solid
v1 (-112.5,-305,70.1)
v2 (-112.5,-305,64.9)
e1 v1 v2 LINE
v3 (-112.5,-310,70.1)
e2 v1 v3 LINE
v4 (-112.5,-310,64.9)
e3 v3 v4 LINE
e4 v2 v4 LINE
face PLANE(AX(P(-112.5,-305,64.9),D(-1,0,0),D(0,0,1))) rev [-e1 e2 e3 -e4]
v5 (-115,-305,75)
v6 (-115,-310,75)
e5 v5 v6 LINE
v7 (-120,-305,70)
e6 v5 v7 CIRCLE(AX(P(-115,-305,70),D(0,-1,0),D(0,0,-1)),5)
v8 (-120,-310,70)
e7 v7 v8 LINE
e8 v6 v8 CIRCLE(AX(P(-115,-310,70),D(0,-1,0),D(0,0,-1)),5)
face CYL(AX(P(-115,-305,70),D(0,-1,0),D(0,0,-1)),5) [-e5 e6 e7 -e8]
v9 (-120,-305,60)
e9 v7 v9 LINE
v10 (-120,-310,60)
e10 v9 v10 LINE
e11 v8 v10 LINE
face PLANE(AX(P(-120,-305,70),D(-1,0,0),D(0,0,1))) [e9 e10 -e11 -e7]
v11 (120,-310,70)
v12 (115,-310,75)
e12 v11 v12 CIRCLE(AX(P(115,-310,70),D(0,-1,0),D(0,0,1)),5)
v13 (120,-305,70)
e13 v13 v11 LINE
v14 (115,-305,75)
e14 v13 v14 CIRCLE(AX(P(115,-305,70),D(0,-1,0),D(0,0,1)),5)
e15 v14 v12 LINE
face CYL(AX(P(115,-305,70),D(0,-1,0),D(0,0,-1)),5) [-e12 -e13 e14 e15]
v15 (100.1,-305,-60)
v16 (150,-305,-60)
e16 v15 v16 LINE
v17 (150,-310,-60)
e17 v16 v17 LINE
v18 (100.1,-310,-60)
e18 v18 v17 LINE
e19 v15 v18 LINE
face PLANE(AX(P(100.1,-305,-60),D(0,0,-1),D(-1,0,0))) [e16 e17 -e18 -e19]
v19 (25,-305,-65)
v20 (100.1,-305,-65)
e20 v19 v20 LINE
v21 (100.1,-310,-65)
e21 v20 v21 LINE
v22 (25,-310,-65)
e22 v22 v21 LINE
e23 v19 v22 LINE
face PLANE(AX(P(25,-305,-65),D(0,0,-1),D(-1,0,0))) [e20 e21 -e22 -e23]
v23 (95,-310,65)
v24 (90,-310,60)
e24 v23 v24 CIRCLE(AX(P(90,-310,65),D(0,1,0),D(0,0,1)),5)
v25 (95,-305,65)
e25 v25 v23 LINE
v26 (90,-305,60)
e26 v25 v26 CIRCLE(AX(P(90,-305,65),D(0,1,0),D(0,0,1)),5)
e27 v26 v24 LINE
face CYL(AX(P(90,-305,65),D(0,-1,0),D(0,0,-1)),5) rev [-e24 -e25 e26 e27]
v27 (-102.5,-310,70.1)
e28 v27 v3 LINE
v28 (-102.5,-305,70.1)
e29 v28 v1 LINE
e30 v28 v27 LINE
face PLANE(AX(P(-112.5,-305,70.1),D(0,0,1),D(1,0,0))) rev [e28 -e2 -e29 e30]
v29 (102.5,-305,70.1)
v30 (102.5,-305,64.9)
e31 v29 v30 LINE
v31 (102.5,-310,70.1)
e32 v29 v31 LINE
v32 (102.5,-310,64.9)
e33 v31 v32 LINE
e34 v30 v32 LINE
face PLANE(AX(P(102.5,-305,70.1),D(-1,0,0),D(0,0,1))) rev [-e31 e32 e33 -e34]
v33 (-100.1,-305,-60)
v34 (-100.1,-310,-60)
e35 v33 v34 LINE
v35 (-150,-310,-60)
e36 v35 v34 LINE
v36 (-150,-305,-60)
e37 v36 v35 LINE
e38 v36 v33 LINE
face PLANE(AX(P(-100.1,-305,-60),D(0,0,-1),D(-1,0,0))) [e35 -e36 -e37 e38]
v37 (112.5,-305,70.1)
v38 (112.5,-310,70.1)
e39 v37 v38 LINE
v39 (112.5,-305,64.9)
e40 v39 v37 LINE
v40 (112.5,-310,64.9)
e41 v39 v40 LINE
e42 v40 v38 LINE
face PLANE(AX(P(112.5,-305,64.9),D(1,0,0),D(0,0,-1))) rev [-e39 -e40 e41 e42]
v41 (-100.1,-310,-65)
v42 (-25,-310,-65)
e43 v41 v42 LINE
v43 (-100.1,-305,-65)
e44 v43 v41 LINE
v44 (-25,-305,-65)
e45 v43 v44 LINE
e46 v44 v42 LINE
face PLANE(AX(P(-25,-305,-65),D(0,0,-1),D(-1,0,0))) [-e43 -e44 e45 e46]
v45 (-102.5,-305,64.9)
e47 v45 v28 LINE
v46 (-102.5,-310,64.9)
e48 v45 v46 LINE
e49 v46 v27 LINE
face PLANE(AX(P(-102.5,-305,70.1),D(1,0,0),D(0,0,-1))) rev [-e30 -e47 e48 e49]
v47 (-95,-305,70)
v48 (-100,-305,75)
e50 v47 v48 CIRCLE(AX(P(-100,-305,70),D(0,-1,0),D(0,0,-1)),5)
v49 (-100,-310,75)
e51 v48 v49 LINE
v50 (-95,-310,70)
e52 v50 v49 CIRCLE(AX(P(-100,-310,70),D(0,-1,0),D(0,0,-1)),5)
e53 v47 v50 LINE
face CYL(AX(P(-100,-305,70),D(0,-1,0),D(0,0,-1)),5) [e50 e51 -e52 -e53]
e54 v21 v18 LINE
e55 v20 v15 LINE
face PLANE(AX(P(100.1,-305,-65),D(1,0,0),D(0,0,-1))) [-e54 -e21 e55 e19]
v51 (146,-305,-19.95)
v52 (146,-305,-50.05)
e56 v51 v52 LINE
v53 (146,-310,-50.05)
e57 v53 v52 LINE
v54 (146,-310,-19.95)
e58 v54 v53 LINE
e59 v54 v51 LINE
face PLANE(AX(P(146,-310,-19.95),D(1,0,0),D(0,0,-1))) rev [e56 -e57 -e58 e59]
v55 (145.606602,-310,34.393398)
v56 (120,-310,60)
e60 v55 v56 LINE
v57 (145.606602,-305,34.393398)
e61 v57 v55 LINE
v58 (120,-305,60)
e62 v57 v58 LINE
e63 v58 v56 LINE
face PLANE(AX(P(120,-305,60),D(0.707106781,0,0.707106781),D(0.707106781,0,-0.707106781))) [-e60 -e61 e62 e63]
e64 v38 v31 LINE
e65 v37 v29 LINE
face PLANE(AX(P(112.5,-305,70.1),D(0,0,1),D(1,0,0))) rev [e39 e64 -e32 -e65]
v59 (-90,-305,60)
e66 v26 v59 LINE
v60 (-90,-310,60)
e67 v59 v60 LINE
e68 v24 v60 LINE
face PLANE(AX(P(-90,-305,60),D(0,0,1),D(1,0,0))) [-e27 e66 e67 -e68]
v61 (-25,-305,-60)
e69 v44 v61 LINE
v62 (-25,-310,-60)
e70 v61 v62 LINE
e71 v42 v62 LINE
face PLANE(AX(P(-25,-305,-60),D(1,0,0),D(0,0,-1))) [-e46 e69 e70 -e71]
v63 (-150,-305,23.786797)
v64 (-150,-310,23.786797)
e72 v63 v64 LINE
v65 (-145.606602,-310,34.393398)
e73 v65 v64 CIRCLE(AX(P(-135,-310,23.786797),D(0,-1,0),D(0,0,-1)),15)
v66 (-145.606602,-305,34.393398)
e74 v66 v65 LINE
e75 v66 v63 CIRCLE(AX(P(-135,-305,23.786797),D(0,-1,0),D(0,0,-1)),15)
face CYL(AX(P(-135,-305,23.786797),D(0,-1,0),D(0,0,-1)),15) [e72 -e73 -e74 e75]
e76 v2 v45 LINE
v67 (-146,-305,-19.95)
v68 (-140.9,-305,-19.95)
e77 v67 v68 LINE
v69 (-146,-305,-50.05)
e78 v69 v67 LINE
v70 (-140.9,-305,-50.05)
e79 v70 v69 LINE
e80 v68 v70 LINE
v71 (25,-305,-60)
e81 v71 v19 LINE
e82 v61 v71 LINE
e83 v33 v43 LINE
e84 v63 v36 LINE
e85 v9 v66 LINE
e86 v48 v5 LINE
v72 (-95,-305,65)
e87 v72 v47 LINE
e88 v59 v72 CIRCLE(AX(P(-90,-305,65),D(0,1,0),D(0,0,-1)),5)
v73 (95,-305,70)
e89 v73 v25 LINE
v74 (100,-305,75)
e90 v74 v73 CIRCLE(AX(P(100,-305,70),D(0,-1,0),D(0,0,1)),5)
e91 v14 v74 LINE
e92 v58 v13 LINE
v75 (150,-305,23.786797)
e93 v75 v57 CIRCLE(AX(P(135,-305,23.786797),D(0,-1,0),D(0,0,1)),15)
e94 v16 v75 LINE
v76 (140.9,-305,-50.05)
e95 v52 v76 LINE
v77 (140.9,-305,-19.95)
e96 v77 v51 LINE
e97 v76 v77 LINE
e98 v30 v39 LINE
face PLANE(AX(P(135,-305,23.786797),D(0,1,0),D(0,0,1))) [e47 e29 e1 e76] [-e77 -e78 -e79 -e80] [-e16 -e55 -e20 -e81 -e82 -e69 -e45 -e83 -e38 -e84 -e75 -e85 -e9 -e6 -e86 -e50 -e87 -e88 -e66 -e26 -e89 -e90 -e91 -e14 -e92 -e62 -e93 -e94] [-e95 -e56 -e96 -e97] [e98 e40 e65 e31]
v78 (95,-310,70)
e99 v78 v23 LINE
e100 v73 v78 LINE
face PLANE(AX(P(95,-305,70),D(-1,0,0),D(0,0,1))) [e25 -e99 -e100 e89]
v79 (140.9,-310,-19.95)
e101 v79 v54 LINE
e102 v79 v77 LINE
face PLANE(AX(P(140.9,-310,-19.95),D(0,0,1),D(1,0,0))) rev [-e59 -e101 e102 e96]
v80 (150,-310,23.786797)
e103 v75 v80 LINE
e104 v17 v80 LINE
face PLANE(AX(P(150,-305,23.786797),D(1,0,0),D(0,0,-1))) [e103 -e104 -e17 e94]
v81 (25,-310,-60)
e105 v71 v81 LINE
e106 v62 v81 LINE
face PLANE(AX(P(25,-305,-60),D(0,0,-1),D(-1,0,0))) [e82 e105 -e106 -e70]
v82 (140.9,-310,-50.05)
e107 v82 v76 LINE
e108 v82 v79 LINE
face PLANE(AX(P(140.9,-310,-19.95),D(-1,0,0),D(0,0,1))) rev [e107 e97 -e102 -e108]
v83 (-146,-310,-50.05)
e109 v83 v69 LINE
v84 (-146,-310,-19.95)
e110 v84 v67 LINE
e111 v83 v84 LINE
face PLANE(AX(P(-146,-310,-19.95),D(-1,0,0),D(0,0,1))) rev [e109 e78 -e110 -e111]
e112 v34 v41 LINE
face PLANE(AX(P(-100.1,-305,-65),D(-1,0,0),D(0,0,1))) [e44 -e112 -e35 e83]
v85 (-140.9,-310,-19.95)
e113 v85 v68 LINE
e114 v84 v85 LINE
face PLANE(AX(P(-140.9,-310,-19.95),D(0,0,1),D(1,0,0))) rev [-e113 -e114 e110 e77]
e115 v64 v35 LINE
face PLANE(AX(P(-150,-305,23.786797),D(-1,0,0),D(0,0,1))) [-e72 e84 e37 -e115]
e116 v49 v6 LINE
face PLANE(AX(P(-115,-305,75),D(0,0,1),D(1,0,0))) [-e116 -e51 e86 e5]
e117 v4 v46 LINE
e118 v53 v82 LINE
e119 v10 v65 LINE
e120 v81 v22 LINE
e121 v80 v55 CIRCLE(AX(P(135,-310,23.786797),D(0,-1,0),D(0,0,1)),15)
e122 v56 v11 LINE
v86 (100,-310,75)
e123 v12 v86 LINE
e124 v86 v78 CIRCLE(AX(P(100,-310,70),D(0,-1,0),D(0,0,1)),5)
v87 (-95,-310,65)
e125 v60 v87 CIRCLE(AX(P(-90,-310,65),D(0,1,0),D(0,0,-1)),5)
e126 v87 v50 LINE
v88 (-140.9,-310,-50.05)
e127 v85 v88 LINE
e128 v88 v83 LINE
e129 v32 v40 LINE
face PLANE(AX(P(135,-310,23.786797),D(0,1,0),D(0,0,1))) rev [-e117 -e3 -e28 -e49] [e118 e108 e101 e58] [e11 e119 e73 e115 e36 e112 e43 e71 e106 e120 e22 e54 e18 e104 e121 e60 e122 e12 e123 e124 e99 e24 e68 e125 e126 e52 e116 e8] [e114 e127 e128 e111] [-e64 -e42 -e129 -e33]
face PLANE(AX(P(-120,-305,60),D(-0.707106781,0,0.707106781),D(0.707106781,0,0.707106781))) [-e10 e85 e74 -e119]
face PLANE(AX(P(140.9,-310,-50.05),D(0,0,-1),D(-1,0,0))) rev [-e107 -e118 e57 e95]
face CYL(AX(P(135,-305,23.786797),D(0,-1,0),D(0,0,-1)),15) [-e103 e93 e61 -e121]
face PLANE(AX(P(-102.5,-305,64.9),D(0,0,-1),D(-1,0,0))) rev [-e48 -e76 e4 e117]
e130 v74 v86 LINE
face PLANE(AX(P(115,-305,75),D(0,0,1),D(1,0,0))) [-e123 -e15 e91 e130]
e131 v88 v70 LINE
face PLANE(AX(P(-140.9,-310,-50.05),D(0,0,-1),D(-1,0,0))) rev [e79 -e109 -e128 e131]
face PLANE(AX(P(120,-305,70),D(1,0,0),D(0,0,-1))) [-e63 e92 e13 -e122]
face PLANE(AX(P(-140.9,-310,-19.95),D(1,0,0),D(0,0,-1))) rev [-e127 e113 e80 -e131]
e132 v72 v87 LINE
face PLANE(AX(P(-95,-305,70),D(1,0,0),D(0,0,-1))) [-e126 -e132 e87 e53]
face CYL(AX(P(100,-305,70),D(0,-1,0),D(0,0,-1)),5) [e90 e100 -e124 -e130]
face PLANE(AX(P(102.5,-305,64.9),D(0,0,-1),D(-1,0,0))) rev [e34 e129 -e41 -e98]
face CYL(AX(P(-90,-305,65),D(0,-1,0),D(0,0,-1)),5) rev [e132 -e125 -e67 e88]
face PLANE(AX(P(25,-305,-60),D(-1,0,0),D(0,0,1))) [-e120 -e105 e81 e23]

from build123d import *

# Parameters (mm, degrees)
BODY_MOVE_COPY1_START         = -65
BODY_MOVE_COPY1_OUTLINE_W     = 5.1
BODY_MOVE_COPY1_OUTLINE_H     = 30.1
BODY_MOVE_COPY1_OUTLINE_R     = 2.6
BODY_MOVE_COPY1_OUTLINE_R_2   = 3.1
BODY_MOVE_COPY1_OUTLINE_R_3   = 1.55
BODY_MOVE_COPY1_OUTLINE_W_2   = 30.5
BODY_MOVE_COPY1_OUTLINE_H_2   = 14.5
BODY_MOVE_COPY1_DEPTH         = 5
BODY_MOVE_COPY1_START_2       = -5
BODY_MOVE_COPY1_2_OUTLINE_W   = 10
BODY_MOVE_COPY1_2_OUTLINE_H   = 5.2
BODY_MOVE_COPY1_2_OUTLINE_R   = 1.6
BODY_MOVE_COPY1_2_OUTLINE_W_2 = 5.1
BODY_MOVE_COPY1_2_OUTLINE_H_2 = 30.1
BODY_MOVE_COPY1_2_DEPTH       = 5
SKETCH26_W                    = 10
SKETCH26_H                    = 5.2
BOSS_EXTRUDE2_DEPTH           = 5
SKETCH28_W                    = 5.1
SKETCH28_H                    = 30.1
CUT_EXTRUDE1_DEPTH            = 349.066085679


# Read off the part's stored shape, not the designer's step: Body-Move/Copy1
with BuildPart() as part:
    # Body-Move/Copy1 outline → Body-Move/Copy1 (new body)
    with BuildSketch(Plane.XY.offset(BODY_MOVE_COPY1_START)):
        Polygon((24.9, -310), (24.9, -305), (100.2, -305), (100.2, -310), (150, -310), (150, -5), (10.65, -5), (10.65, 0), (-10.65, 0), (-10.65, -5), (-150, -5), (-150, -310), (-100.2, -310), (-100.2, -305), (-24.9, -305), (-24.9, -310), align=None)
        with Locations((-143.45, -280)):
            Rectangle(BODY_MOVE_COPY1_OUTLINE_W, BODY_MOVE_COPY1_OUTLINE_H, mode=Mode.SUBTRACT)
        with Locations((-90, -157.5)):
            Circle(BODY_MOVE_COPY1_OUTLINE_R, mode=Mode.SUBTRACT)
        with Locations((-60, -157.5)):
            Circle(BODY_MOVE_COPY1_OUTLINE_R, mode=Mode.SUBTRACT)
        with Locations((143.45, -280)):
            Rectangle(BODY_MOVE_COPY1_OUTLINE_W, BODY_MOVE_COPY1_OUTLINE_H, mode=Mode.SUBTRACT)
        with Locations((65, -157.5)):
            Circle(BODY_MOVE_COPY1_OUTLINE_R_2, mode=Mode.SUBTRACT)
        with Locations((85, -157.5)):
            Circle(BODY_MOVE_COPY1_OUTLINE_R_2, mode=Mode.SUBTRACT)
        with Locations((-90, -137.5)):
            Circle(BODY_MOVE_COPY1_OUTLINE_R_3, mode=Mode.SUBTRACT)
        with Locations((-60, -137.5)):
            Circle(BODY_MOVE_COPY1_OUTLINE_R_3, mode=Mode.SUBTRACT)
        with Locations((-75, -100.25)):
            Rectangle(BODY_MOVE_COPY1_OUTLINE_W_2, BODY_MOVE_COPY1_OUTLINE_H_2, mode=Mode.SUBTRACT)
        with Locations((-143.45, -30)):
            Rectangle(BODY_MOVE_COPY1_OUTLINE_W, BODY_MOVE_COPY1_OUTLINE_H, mode=Mode.SUBTRACT)
        with Locations((143.45, -30)):
            Rectangle(BODY_MOVE_COPY1_OUTLINE_W, BODY_MOVE_COPY1_OUTLINE_H, mode=Mode.SUBTRACT)
    extrude(amount=BODY_MOVE_COPY1_DEPTH)


with BuildPart() as body_2:
    # Body-Move_Copy1 2 outline → Body-Move_Copy1 2 (new body)
    with BuildSketch(Plane(origin=(0, 0, 0), x_dir=(1, 0, 0), z_dir=(0, 1, 0)).offset(BODY_MOVE_COPY1_START_2)):
        with BuildLine():
            ThreePointArc((-95, -65), (-93.535533906, -61.464466094), (-90, -60))
            Line((-90, -60), (90, -60))
            ThreePointArc((90, -60), (93.535533906, -61.464466094), (95, -65))
            Line((95, -65), (95, -70))
            ThreePointArc((95, -70), (96.464466094, -73.535533906), (100, -75))
            Line((100, -75), (115, -75))
            ThreePointArc((115, -75), (118.535533906, -73.535533906), (120, -70))
            Line((120, -70), (120, -60))
            Line((120, -60), (145.606601718, -34.393398282))
            ThreePointArc((145.606601718, -34.393398282), (148.858192988, -29.52704805), (150, -23.786796564))
            Line((150, -23.786796564), (150, 65))
            Line((150, 65), (10.75, 65))
            Line((10.75, 65), (10.75, 60))
            Line((10.75, 60), (-10.75, 60))
            Line((-10.75, 60), (-10.75, 65))
            Line((-10.75, 65), (-150, 65))
            Line((-150, 65), (-150, -23.786796564))
            ThreePointArc((-150, -23.786796564), (-148.858192988, -29.52704805), (-145.606601718, -34.393398282))
            Line((-145.606601718, -34.393398282), (-120, -60))
            Line((-120, -60), (-120, -70))
            ThreePointArc((-120, -70), (-118.535533906, -73.535533906), (-115, -75))
            Line((-115, -75), (-100, -75))
            ThreePointArc((-100, -75), (-96.464466094, -73.535533906), (-95, -70))
            Line((-95, -70), (-95, -65))
        make_face()
        with Locations((-107.5, -67.5)):
            Rectangle(BODY_MOVE_COPY1_2_OUTLINE_W, BODY_MOVE_COPY1_2_OUTLINE_H, mode=Mode.SUBTRACT)
        with Locations((-110, -52.5)):
            Circle(BODY_MOVE_COPY1_2_OUTLINE_R, mode=Mode.SUBTRACT)
        with Locations((-5, -52.5)):
            Circle(BODY_MOVE_COPY1_2_OUTLINE_R, mode=Mode.SUBTRACT)
        with Locations((5, -52.5)):
            Circle(BODY_MOVE_COPY1_2_OUTLINE_R, mode=Mode.SUBTRACT)
        with Locations((107.5, -67.5)):
            Rectangle(BODY_MOVE_COPY1_2_OUTLINE_W, BODY_MOVE_COPY1_2_OUTLINE_H, mode=Mode.SUBTRACT)
        with Locations((110, -52.5)):
            Circle(BODY_MOVE_COPY1_2_OUTLINE_R, mode=Mode.SUBTRACT)
        with Locations((-143.45, 35)):
            Rectangle(BODY_MOVE_COPY1_2_OUTLINE_W_2, BODY_MOVE_COPY1_2_OUTLINE_H_2, mode=Mode.SUBTRACT)
        with Locations((-110, 52.5)):
            Circle(BODY_MOVE_COPY1_2_OUTLINE_R, mode=Mode.SUBTRACT)
        with Locations((-5, 52.5)):
            Circle(BODY_MOVE_COPY1_2_OUTLINE_R, mode=Mode.SUBTRACT)
        with BuildLine():
            Line((131.606601718, -30.178932188), (115.267766953, -46.517766953))
            ThreePointArc((115.267766953, -46.517766953), (114.456708581, -47.059698831), (113.5, -47.25))
            Line((113.5, -47.25), (107.75, -47.25))
            ThreePointArc((107.75, -47.25), (105.982233047, -47.982233047), (105.25, -49.75))
            Line((105.25, -49.75), (105.25, -53.5))
            ThreePointArc((105.25, -53.5), (104.517766953, -55.267766953), (102.75, -56))
            Line((102.75, -56), (13.25, -56))
            ThreePointArc((13.25, -56), (11.482233047, -55.267766953), (10.75, -53.5))
            Line((10.75, -53.5), (10.75, -49.75))
            ThreePointArc((10.75, -49.75), (10.017766953, -47.982233047), (8.25, -47.25))
            Line((8.25, -47.25), (-8.25, -47.25))
            ThreePointArc((-8.25, -47.25), (-10.017766953, -47.982233047), (-10.75, -49.75))
            Line((-10.75, -49.75), (-10.75, -53.5))
            ThreePointArc((-10.75, -53.5), (-11.482233047, -55.267766953), (-13.25, -56))
            Line((-13.25, -56), (-102.75, -56))
            ThreePointArc((-102.75, -56), (-104.517766953, -55.267766953), (-105.25, -53.5))
            Line((-105.25, -53.5), (-105.25, -49.75))
            ThreePointArc((-105.25, -49.75), (-105.982233047, -47.982233047), (-107.75, -47.25))
            Line((-107.75, -47.25), (-113.5, -47.25))
            ThreePointArc((-113.5, -47.25), (-115.267766953, -46.517766953), (-116, -44.75))
            Line((-116, -44.75), (-116, 44.75))
            ThreePointArc((-116, 44.75), (-115.267766953, 46.517766953), (-113.5, 47.25))
            Line((-113.5, 47.25), (-107.75, 47.25))
            ThreePointArc((-107.75, 47.25), (-105.982233047, 47.982233047), (-105.25, 49.75))
            Line((-105.25, 49.75), (-105.25, 53.5))
            ThreePointArc((-105.25, 53.5), (-104.517766953, 55.267766953), (-102.75, 56))
            Line((-102.75, 56), (-13.25, 56))
            ThreePointArc((-13.25, 56), (-11.482233047, 55.267766953), (-10.75, 53.5))
            Line((-10.75, 53.5), (-10.75, 49.75))
            ThreePointArc((-10.75, 49.75), (-10.017766953, 47.982233047), (-8.25, 47.25))
            Line((-8.25, 47.25), (8.25, 47.25))
            ThreePointArc((8.25, 47.25), (10.017766953, 47.982233047), (10.75, 49.75))
            Line((10.75, 49.75), (10.75, 53.5))
            ThreePointArc((10.75, 53.5), (11.482233047, 55.267766953), (13.25, 56))
            Line((13.25, 56), (102.75, 56))
            ThreePointArc((102.75, 56), (104.517766953, 55.267766953), (105.25, 53.5))
            Line((105.25, 53.5), (105.25, 49.75))
            ThreePointArc((105.25, 49.75), (105.982233047, 47.982233047), (107.75, 47.25))
            Line((107.75, 47.25), (113.5, 47.25))
            ThreePointArc((113.5, 47.25), (115.267766953, 47.982233047), (116, 49.75))
            Line((116, 49.75), (116, 53.5))
            ThreePointArc((116, 53.5), (116.732233047, 55.267766953), (118.5, 56))
            Line((118.5, 56), (133.5, 56))
            ThreePointArc((133.5, 56), (135.267766953, 55.267766953), (136, 53.5))
            Line((136, 53.5), (136, -19.57233047))
            ThreePointArc((136, -19.57233047), (134.858192988, -25.312581956), (131.606601718, -30.178932188))
        make_face(mode=Mode.SUBTRACT)
        with Locations((5, 52.5)):
            Circle(BODY_MOVE_COPY1_2_OUTLINE_R, mode=Mode.SUBTRACT)
        with Locations((143.45, 35)):
            Rectangle(BODY_MOVE_COPY1_2_OUTLINE_W_2, BODY_MOVE_COPY1_2_OUTLINE_H_2, mode=Mode.SUBTRACT)
        with Locations((110, 52.5)):
            Circle(BODY_MOVE_COPY1_2_OUTLINE_R, mode=Mode.SUBTRACT)
    extrude(amount=BODY_MOVE_COPY1_2_DEPTH)


with BuildPart() as body_3:
    # Sketch26 → Boss-Extrude2 (new body)
    with BuildSketch(Plane.XZ.offset(310)):
        with BuildLine():
            Line((-90, 60), (90, 60))
            ThreePointArc((90, 60), (93.535533906, 61.464466094), (95, 65))
            Line((95, 65), (95, 70))
            ThreePointArc((95, 70), (96.464466094, 73.535533906), (100, 75))
            Line((100, 75), (115, 75))
            ThreePointArc((115, 75), (118.535533906, 73.535533906), (120, 70))
            Line((120, 70), (120, 60))
            Line((120, 60), (145.606601718, 34.393398282))
            ThreePointArc((145.606601718, 34.393398282), (148.858192988, 29.52704805), (150, 23.786796564))
            Line((150, 23.786796564), (150, -60))
            Line((150, -60), (100.1, -60))
            Line((100.1, -60), (100.1, -65))
            Line((100.1, -65), (25, -65))
            Line((25, -65), (25, -60))
            Line((25, -60), (-25, -60))
            Line((-25, -60), (-25, -65))
            Line((-25, -65), (-100.1, -65))
            Line((-100.1, -65), (-100.1, -60))
            Line((-100.1, -60), (-150, -60))
            Line((-150, -60), (-150, 23.786796564))
            ThreePointArc((-150, 23.786796564), (-148.858192988, 29.52704805), (-145.606601718, 34.393398282))
            Line((-145.606601718, 34.393398282), (-120, 60))
            Line((-120, 60), (-120, 70))
            ThreePointArc((-120, 70), (-118.535533906, 73.535533906), (-115, 75))
            Line((-115, 75), (-100, 75))
            ThreePointArc((-100, 75), (-96.464466094, 73.535533906), (-95, 70))
            Line((-95, 70), (-95, 65))
            ThreePointArc((-95, 65), (-93.535533906, 61.464466094), (-90, 60))
        make_face()
        with Locations((107.5, 67.5)):
            Rectangle(SKETCH26_W, SKETCH26_H, mode=Mode.SUBTRACT)
        with Locations((-107.5, 67.5)):
            Rectangle(SKETCH26_W, SKETCH26_H, mode=Mode.SUBTRACT)
    extrude(amount=-BOSS_EXTRUDE2_DEPTH)

    # Sketch28 → Cut-Extrude1 (cut, through all)
    with BuildSketch(Plane(origin=(0, -305, 0), x_dir=(1, 0, 0), z_dir=(0, 1, 0))):
        with Locations((143.45, 35)):
            Rectangle(SKETCH28_W, SKETCH28_H)
        with Locations((-143.45, 35)):
            Rectangle(SKETCH28_W, SKETCH28_H)
    extrude(amount=-CUT_EXTRUDE1_DEPTH, mode=Mode.SUBTRACT)


solid = body_3.part
